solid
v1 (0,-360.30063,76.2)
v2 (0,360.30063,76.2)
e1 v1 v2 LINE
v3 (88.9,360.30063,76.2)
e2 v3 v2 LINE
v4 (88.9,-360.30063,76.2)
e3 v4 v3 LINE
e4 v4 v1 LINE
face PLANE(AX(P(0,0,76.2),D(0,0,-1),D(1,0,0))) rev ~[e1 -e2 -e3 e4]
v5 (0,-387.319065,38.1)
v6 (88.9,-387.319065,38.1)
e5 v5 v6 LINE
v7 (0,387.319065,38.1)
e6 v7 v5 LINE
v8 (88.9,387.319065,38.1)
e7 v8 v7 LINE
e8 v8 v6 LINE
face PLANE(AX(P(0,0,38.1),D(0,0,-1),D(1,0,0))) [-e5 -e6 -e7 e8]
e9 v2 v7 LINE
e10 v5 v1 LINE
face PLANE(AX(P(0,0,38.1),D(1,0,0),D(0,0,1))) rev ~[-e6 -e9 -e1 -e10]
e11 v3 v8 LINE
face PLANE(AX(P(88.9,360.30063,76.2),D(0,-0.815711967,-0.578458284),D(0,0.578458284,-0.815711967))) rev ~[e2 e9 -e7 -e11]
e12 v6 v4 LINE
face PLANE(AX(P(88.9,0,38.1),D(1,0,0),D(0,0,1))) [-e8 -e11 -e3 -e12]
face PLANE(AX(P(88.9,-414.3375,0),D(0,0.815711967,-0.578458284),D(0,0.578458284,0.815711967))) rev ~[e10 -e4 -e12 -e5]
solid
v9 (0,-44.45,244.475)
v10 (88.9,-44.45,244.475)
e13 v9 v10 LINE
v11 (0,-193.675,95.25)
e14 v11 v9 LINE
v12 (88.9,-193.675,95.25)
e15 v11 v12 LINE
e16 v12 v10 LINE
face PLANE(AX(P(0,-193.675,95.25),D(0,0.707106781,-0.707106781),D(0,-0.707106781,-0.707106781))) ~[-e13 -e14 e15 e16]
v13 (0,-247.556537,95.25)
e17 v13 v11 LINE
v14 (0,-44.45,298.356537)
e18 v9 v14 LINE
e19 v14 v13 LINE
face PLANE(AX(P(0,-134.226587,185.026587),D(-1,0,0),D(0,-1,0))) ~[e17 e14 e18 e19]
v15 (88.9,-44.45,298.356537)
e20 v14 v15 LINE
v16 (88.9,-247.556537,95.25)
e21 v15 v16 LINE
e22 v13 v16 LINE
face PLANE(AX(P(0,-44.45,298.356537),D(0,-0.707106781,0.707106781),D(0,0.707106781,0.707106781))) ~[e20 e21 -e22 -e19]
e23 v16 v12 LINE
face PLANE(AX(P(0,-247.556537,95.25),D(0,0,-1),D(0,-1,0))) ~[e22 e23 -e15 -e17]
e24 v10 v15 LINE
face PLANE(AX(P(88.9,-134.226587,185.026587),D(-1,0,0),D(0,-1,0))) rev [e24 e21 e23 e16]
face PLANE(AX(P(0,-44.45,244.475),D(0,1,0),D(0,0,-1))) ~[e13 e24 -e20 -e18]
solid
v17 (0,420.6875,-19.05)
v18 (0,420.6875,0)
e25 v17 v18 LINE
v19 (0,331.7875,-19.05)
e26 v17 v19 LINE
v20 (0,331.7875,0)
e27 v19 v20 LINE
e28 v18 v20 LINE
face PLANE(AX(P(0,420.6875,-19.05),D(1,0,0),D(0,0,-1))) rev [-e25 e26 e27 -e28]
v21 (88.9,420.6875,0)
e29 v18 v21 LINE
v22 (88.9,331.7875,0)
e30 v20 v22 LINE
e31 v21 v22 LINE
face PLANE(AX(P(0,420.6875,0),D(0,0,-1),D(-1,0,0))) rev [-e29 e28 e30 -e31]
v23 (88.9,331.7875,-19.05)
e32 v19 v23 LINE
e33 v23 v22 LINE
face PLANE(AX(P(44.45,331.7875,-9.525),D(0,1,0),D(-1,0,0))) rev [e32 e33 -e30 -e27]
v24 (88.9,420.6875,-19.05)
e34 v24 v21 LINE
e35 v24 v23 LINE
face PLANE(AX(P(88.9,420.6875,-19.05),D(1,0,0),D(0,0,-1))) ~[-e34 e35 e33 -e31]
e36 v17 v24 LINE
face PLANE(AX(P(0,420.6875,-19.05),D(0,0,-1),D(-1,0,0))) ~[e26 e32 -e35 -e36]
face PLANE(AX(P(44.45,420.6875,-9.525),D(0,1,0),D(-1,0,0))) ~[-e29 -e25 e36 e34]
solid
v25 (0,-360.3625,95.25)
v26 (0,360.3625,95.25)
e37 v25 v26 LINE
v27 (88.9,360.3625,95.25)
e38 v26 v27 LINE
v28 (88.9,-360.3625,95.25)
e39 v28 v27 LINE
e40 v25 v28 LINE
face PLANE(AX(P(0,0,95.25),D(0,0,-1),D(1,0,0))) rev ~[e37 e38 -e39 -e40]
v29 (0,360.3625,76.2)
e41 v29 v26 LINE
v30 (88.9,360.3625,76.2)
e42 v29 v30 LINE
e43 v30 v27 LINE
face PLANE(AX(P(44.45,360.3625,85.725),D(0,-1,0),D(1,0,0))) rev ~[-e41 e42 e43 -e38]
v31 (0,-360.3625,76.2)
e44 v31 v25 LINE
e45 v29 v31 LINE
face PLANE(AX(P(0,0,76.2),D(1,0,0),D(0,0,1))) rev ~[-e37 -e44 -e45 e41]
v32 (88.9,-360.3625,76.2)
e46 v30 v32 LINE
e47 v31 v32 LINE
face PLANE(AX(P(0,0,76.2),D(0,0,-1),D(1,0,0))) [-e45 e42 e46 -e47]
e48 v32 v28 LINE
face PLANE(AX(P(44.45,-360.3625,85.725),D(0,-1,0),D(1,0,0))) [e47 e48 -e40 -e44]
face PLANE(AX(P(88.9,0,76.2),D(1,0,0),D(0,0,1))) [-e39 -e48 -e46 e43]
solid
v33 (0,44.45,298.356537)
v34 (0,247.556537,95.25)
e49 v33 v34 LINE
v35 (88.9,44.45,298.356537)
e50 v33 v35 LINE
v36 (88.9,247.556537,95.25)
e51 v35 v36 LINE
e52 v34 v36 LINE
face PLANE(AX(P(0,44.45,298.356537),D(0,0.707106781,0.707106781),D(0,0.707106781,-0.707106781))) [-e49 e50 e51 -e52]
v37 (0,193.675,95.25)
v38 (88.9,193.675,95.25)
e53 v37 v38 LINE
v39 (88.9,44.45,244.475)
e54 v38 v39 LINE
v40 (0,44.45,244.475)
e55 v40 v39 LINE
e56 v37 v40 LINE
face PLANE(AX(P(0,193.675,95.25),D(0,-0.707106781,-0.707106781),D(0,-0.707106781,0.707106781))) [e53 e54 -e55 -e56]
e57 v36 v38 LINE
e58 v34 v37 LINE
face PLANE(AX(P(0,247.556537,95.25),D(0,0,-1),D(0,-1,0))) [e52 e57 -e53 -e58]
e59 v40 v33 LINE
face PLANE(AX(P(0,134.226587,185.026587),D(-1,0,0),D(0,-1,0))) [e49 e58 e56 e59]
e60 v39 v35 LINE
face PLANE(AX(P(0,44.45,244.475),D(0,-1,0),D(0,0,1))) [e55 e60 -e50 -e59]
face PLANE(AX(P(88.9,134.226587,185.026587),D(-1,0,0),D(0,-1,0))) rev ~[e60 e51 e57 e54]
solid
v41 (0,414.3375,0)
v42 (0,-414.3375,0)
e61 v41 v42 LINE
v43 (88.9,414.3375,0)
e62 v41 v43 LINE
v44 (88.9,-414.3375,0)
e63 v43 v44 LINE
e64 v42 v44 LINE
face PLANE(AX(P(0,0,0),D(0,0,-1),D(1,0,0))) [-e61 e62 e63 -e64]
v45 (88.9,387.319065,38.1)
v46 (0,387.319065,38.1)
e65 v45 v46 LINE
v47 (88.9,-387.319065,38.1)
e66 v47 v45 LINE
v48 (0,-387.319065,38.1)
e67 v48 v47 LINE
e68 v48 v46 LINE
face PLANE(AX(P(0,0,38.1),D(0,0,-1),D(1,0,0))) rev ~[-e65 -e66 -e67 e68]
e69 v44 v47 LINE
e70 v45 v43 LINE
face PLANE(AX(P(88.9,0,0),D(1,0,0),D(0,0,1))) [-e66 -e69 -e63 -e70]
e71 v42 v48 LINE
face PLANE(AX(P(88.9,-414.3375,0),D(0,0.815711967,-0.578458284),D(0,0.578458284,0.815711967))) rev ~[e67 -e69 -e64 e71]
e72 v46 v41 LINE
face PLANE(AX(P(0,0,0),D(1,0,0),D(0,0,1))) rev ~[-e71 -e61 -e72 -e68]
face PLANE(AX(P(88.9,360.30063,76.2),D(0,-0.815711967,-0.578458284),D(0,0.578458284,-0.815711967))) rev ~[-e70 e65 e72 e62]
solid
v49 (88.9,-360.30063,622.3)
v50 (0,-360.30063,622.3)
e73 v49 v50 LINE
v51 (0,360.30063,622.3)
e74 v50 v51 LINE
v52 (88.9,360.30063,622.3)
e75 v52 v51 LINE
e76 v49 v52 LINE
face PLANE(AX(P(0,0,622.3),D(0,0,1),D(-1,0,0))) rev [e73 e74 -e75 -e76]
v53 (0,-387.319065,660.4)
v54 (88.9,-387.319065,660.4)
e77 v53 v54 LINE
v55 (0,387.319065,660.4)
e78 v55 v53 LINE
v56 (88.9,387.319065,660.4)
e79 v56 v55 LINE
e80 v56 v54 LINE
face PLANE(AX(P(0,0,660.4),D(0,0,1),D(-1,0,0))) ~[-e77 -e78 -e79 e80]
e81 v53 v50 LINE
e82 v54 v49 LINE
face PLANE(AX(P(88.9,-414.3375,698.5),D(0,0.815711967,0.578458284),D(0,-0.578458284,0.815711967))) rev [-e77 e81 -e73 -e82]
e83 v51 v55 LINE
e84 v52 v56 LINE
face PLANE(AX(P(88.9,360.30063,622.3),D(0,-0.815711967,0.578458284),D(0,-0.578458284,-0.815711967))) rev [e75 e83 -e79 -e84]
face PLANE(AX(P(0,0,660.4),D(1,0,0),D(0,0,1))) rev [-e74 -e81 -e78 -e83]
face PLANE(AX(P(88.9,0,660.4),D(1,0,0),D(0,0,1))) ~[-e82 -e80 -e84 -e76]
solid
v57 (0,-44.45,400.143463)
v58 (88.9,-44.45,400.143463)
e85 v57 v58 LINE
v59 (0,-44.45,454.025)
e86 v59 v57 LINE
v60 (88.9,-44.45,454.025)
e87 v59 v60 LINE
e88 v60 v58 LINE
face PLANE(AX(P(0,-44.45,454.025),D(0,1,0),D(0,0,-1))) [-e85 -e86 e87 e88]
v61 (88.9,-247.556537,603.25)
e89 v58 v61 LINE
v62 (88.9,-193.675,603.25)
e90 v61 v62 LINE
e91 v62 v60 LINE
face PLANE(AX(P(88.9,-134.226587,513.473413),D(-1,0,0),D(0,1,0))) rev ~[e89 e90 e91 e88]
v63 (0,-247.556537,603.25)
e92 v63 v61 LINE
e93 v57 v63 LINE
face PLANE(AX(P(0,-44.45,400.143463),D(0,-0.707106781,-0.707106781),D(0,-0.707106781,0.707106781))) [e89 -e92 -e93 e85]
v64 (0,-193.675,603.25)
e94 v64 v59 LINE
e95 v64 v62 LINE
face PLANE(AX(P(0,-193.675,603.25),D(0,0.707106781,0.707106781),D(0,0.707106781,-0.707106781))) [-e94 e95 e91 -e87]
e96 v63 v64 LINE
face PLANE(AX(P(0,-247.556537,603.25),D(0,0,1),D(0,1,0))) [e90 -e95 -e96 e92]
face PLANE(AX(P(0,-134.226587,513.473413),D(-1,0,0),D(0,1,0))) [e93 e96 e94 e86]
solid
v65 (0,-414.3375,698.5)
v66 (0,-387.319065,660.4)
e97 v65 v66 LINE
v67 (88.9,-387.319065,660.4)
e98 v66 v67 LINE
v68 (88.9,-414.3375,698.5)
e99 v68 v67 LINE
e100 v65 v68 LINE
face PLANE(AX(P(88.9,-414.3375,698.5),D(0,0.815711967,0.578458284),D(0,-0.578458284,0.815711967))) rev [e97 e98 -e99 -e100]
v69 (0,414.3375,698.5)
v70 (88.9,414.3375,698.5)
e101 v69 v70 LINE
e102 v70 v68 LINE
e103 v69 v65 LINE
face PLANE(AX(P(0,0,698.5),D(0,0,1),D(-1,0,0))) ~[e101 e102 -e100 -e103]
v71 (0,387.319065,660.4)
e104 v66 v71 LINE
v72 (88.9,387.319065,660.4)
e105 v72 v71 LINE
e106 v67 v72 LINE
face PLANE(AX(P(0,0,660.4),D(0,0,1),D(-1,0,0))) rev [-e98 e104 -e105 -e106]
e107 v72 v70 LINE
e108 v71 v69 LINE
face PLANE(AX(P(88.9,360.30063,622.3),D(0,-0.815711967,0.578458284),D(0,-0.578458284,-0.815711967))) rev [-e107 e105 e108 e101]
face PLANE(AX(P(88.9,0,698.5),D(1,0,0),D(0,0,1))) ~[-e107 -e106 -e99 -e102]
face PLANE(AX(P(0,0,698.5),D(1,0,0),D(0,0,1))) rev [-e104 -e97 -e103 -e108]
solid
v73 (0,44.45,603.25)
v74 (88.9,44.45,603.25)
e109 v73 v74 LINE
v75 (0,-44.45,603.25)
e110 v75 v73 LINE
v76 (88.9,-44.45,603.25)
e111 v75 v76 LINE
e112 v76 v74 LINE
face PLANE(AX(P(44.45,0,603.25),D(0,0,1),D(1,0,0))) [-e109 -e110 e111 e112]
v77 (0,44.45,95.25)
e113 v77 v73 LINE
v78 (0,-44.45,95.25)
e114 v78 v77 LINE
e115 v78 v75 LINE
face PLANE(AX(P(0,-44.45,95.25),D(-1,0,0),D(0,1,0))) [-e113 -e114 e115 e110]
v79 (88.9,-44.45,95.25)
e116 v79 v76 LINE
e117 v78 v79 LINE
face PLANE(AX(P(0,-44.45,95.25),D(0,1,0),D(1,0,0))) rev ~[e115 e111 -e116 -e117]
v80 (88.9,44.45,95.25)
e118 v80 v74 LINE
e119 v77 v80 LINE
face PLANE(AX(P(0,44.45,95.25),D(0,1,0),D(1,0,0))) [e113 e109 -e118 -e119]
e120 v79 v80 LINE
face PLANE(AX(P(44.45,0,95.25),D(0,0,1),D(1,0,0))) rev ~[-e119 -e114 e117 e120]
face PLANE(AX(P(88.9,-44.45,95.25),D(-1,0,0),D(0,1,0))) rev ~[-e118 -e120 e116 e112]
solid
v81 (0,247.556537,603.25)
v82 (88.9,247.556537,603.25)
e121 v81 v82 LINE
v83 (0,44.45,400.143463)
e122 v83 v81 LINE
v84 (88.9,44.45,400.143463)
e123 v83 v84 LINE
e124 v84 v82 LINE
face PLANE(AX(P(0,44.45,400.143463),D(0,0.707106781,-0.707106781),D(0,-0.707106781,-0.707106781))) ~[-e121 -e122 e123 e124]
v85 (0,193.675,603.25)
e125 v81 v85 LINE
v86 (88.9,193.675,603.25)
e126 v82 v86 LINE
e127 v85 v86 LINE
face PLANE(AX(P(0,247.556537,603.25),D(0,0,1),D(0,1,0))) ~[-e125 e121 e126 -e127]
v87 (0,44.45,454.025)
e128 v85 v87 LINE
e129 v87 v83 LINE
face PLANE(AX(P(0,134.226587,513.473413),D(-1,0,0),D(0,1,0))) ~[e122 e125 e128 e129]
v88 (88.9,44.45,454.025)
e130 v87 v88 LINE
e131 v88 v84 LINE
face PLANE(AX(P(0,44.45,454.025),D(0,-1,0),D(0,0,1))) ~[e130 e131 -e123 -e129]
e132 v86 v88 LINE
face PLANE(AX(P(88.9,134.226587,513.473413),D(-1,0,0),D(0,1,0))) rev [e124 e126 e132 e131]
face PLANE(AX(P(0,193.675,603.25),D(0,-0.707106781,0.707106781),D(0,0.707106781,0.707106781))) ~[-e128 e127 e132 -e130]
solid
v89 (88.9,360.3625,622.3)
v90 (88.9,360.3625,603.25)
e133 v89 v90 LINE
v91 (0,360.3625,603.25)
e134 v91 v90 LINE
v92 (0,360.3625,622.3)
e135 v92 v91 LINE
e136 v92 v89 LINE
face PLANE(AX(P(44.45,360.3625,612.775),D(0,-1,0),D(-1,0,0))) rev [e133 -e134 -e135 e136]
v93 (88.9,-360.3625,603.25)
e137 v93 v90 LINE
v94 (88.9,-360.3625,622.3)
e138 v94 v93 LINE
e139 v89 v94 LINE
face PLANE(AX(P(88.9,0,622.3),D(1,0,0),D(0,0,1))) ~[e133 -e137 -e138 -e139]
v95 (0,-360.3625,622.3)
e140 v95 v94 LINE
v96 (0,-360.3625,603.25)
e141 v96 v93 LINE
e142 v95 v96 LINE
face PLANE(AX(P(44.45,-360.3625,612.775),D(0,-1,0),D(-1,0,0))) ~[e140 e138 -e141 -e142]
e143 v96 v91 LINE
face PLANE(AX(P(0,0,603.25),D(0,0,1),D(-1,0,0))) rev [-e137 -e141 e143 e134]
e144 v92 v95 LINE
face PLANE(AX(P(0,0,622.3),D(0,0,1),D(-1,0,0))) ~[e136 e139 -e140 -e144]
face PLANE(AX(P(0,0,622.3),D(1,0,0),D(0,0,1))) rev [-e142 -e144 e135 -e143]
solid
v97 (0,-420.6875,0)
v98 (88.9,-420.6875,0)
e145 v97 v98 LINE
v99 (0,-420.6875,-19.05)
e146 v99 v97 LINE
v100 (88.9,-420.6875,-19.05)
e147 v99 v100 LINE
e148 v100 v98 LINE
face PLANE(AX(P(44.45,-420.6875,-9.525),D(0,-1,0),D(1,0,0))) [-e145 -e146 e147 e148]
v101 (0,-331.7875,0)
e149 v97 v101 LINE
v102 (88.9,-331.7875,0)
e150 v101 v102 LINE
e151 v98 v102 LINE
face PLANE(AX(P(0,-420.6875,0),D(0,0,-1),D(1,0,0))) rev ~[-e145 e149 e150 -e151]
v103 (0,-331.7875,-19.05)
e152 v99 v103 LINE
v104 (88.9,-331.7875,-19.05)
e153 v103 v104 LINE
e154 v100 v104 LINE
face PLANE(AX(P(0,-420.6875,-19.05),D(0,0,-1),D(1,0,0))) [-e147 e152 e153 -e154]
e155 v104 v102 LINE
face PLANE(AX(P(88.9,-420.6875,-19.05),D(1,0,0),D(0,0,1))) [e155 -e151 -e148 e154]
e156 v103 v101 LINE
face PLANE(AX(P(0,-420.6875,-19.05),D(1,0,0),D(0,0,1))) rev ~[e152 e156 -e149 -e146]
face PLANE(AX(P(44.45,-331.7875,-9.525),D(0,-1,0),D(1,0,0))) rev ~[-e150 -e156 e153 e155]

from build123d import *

# Parameters (mm, degrees)
F0_W      = 88.9
F0_H      = 38.1
F1_DEPTH  = 414.3375
F2_W      = 88.9
F2_H      = 38.1
F3_DEPTH  = 414.3375
F5_W      = 88.9
F5_H      = 19.05
F6_DEPTH  = 88.9
F8_W      = 88.9
F8_H      = 19.05
F9_DEPTH  = 360.3625
F11_DEPTH = 88.901
F12_W     = 88.9
F12_H     = 88.9
F13_DEPTH = 508
F17_DEPTH = 88.9


# Not quite as in the source:
# - a feature names something its author has since deleted; it is built from what else it names


with BuildPart() as f1:
    # F0 (on Front) → F1 (new body, symmetric)
    with BuildSketch(Plane.XZ):
        with Locations((44.45, 19.05)):
            Rectangle(F0_W, F0_H)
    extrude(amount=F1_DEPTH, both=True)


with BuildPart() as f3:
    # F2 (on Front) → F3 (new body, symmetric)
    with BuildSketch(Plane.XZ):
        with Locations((44.45, 57.15)):
            Rectangle(F2_W, F2_H)
    extrude(amount=F3_DEPTH, both=True)


with BuildPart() as f6:
    # F5 (on offset) → F6 (new body)
    with BuildSketch(Plane.XZ.offset(420.6875)):
        with Locations((44.45, -9.525)):
            Rectangle(F5_W, F5_H)
    extrude(amount=-F6_DEPTH)


with BuildPart() as f7_1:
    # F7: instance of F6
    add(f6.part.mirror(Plane.XZ))


with BuildPart() as f9:
    # F8 (on Front) → F9 (new body, symmetric)
    with BuildSketch(Plane.XZ):
        with Locations((44.45, 85.725)):
            Rectangle(F8_W, F8_H)
    extrude(amount=F9_DEPTH, both=True)


with BuildPart() as f11_tool:
    # F10 (on face) → F11 (new body, through all)
    with BuildSketch(Plane.YZ.offset(88.9)):
        Polygon((-360.300630331, 76.2), (-414.3375, 76.2), (-414.3375, 38.1), (-387.3190651655, 38.1), align=None)
        Polygon((-387.3190651655, 38.1), (-414.3375, 38.1), (-414.3375, 0), align=None)
        Polygon((414.3375, 76.2), (360.300630331, 76.2), (387.3190651655, 38.1), (414.3375, 38.1), align=None)
        Polygon((414.3375, 38.1), (387.3190651655, 38.1), (414.3375, 0), align=None)
    extrude(amount=-F11_DEPTH)


with BuildPart() as f1_1:
    add(f1.part)

    # F11: cut by f11_tool
    add(f11_tool.part, mode=Mode.SUBTRACT)


with BuildPart() as f3_1:
    add(f3.part)

    # F11: cut by f11_tool
    add(f11_tool.part, mode=Mode.SUBTRACT)


with BuildPart() as f13:
    # F12 (on face) → F13 (new body)
    with BuildSketch(Plane.XY.offset(95.25)):
        with Locations((44.45, 0)):
            Rectangle(F12_W, F12_H)
    extrude(amount=F13_DEPTH)


with BuildPart() as f15_1:
    # F15: instance of F9
    add(f9.part.mirror(Plane.XY.offset(349.25)))


with BuildPart() as f15_2:
    # F15: instance of F3
    add(f3_1.part.mirror(Plane.XY.offset(349.25)))


with BuildPart() as f15_3:
    # F15: instance of F1
    add(f1_1.part.mirror(Plane.XY.offset(349.25)))


with BuildPart() as f17:
    # F16 (on face) → F17 (new body)
    with BuildSketch(Plane(origin=(0, 0, 0), x_dir=(0, -1, 0), z_dir=(-1, 0, 0))):
        Polygon((-247.5565367264, 95.25), (-193.675, 95.25), (-44.45, 244.475), (-44.45, 298.3565367264), align=None)
    extrude(amount=-F17_DEPTH)


with BuildPart() as f18_1:
    # F18: instance of F17
    add(f17.part.mirror(Plane.XZ))


with BuildPart() as f19_1:
    # F19: instance of F17
    add(f17.part.mirror(Plane.XY.offset(349.25)))


with BuildPart() as f19_2:
    # F19: instance of F18_1
    add(f18_1.part.mirror(Plane.XY.offset(349.25)))


solid = Compound([f6.part, f7_1.part, f9.part, f1_1.part, f3_1.part, f13.part, f15_1.part, f15_2.part, f15_3.part, f17.part, f18_1.part, f19_1.part, f19_2.part])
